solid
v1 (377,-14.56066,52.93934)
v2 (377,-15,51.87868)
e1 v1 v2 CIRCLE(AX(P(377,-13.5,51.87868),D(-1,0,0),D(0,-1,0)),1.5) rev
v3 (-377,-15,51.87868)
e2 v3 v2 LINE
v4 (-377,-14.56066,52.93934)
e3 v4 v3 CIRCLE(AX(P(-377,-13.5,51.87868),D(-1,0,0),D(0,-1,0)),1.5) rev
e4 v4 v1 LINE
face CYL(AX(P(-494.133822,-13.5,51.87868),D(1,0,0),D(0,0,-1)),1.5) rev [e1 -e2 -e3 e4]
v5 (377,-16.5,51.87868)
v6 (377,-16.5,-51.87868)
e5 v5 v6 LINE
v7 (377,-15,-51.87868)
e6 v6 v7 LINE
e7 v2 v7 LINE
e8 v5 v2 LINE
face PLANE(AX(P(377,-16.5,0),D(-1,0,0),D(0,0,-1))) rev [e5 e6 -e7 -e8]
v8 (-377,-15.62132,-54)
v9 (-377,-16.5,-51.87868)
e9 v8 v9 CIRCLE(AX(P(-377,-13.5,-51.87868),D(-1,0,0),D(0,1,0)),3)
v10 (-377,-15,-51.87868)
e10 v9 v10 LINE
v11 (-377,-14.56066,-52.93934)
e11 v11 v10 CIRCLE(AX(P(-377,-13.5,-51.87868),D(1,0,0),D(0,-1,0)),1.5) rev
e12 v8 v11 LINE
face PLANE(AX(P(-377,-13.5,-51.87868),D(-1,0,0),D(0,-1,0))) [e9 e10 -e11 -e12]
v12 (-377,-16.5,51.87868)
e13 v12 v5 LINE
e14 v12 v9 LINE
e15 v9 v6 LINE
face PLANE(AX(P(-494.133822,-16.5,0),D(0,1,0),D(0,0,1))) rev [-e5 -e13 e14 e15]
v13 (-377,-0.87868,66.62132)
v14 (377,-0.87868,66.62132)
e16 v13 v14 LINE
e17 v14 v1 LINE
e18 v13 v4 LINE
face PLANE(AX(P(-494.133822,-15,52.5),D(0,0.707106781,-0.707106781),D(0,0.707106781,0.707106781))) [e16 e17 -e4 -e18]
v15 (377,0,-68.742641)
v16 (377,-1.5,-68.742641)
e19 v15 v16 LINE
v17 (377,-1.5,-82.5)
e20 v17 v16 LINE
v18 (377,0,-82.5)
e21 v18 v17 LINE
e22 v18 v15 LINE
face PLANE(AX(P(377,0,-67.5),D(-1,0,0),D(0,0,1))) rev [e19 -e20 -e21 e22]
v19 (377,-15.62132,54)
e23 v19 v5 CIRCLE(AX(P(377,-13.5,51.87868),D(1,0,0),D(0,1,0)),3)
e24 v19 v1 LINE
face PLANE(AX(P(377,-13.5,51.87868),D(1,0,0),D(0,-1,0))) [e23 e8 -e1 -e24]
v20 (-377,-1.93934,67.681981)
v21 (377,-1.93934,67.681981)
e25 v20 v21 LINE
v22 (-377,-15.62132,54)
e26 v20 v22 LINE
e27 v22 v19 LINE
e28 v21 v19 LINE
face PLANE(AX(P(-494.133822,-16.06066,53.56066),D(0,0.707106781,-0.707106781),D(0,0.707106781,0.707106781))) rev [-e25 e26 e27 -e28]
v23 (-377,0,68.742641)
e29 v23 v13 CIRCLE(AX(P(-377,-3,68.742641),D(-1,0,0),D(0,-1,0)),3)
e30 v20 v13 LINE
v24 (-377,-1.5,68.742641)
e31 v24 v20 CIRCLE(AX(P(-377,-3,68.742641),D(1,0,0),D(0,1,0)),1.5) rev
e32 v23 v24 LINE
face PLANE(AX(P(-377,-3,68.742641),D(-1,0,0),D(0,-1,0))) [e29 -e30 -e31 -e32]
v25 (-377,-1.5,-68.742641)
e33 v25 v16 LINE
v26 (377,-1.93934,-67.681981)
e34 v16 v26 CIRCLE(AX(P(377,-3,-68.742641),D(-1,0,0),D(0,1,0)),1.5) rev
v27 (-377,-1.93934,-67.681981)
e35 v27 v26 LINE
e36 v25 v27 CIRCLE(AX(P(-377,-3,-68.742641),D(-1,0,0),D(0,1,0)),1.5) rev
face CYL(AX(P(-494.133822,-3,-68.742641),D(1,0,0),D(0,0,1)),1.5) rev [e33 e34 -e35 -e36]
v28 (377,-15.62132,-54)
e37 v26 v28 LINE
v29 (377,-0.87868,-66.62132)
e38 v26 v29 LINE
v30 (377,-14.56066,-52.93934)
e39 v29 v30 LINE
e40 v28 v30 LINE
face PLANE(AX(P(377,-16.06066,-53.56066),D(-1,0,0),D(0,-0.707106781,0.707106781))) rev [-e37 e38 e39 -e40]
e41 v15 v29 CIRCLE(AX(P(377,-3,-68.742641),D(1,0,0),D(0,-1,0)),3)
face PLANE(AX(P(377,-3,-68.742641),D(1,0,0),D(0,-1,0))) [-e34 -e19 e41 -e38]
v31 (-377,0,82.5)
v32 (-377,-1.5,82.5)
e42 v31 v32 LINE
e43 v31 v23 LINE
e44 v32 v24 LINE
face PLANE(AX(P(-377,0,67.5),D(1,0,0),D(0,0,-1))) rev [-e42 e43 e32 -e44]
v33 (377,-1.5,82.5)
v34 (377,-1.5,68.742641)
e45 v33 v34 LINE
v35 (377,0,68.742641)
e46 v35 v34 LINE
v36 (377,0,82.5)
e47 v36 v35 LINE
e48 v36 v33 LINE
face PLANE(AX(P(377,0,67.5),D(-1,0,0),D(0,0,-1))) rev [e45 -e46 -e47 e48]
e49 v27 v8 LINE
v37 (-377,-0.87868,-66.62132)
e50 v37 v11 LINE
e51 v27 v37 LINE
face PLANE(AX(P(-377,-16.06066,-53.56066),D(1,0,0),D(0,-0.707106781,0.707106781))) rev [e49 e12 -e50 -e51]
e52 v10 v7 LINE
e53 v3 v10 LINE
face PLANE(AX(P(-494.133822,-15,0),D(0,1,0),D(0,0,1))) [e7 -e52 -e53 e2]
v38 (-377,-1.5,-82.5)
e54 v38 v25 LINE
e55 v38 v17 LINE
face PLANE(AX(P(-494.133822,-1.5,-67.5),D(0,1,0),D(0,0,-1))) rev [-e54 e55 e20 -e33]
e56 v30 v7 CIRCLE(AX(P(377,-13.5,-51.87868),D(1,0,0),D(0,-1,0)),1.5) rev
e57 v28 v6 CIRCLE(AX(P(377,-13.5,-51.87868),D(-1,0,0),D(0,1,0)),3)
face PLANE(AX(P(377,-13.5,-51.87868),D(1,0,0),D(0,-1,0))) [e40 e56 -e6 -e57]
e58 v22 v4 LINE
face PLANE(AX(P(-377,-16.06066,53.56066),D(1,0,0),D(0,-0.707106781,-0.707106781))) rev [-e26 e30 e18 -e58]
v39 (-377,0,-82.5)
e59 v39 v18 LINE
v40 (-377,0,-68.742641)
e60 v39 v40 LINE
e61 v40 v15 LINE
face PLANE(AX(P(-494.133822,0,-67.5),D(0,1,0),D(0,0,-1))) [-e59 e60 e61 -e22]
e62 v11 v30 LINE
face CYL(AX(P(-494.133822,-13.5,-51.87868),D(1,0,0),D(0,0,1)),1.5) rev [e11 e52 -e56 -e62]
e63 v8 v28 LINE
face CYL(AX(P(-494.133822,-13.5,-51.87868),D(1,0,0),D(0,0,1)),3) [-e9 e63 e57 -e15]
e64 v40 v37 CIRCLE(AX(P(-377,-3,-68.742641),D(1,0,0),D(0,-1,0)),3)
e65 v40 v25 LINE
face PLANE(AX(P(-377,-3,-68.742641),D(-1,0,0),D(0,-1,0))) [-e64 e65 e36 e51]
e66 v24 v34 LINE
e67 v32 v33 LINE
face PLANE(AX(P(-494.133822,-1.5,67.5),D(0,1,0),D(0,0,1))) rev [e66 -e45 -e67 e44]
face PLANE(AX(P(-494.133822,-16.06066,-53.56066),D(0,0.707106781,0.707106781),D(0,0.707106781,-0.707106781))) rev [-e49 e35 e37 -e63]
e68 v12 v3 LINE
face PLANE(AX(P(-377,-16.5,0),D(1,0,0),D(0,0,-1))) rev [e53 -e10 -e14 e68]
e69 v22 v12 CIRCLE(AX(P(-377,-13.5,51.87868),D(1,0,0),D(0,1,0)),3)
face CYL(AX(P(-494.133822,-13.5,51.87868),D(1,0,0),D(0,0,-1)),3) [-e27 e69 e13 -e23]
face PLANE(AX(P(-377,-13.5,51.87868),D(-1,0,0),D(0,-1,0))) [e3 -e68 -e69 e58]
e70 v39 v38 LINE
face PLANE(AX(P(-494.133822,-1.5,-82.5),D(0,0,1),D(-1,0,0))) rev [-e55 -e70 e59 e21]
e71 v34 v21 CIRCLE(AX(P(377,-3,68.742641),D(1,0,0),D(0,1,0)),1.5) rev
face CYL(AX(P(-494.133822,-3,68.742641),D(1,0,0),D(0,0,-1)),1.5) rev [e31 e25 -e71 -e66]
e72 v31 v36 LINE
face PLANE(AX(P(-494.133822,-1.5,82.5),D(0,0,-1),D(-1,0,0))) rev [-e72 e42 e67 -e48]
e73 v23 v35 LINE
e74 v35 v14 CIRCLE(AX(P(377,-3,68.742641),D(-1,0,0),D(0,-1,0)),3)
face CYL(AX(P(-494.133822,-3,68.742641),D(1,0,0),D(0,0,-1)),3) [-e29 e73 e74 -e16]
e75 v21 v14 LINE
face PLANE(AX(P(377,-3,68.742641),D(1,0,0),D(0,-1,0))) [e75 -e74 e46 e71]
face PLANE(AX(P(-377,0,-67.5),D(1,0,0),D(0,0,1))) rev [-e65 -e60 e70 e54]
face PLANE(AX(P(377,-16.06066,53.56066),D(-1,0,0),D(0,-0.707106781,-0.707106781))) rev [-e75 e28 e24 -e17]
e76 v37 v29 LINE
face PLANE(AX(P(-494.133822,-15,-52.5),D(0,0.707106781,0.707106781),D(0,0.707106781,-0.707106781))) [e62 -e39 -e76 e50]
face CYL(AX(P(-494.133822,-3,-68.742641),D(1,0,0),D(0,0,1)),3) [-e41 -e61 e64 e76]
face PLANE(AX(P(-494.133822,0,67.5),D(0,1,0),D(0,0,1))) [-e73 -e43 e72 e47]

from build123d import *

# Parameters (mm, degrees)
SM_BASE_FLANGE_1_DEPTH = 377


# Sheet-metal steps are written as plain solids
with BuildPart() as part:
    # Sketch 1 → Базовая кромка1 (new body)
    with BuildSketch(Plane(origin=(0, 0, 0), x_dir=(0, 0, -1), z_dir=(1, 0, 0))):
        with BuildLine():
            Line((0, -15), (-51.878679656, -15))
            ThreePointArc((-51.878679656, -15), (-52.452704805, -14.885819299), (-52.939339828, -14.560660172))
            Line((-52.939339828, -14.560660172), (-66.621320344, -0.878679656))
            ThreePointArc((-66.621320344, -0.878679656), (-67.59459039, -0.228361402), (-68.742640687, 0))
            Line((-68.742640687, 0), (-82.5, 0))
            Line((-82.5, 0), (-82.5, -1.5))
            Line((-82.5, -1.5), (-68.742640687, -1.5))
            ThreePointArc((-68.742640687, -1.5), (-68.168615539, -1.614180701), (-67.681980515, -1.939339828))
            Line((-67.681980515, -1.939339828), (-54, -15.621320344))
            ThreePointArc((-54, -15.621320344), (-53.026729954, -16.271638598), (-51.878679656, -16.5))
            Line((-51.878679656, -16.5), (0, -16.5))
            Line((0, -16.5), (0, -15))
        make_face()
    extrude(amount=-SM_BASE_FLANGE_1_DEPTH)

    # Зеркальное отражение1: part across plane


with BuildPart() as part_1:
    add(part.part)
    add(part.part.mirror(Plane(origin=(-494.133821974, -15, 0), x_dir=(1, 0, 0), z_dir=(0, 0, 1))))

    # Зеркальное отражение2: part across plane


with BuildPart() as part_2:
    add(part_1.part)
    add(part_1.part.mirror(Plane(origin=(0, -15.621320344, 54), x_dir=(0, 0, 1), z_dir=(1, 0, 0))))


solid = part_2.part
